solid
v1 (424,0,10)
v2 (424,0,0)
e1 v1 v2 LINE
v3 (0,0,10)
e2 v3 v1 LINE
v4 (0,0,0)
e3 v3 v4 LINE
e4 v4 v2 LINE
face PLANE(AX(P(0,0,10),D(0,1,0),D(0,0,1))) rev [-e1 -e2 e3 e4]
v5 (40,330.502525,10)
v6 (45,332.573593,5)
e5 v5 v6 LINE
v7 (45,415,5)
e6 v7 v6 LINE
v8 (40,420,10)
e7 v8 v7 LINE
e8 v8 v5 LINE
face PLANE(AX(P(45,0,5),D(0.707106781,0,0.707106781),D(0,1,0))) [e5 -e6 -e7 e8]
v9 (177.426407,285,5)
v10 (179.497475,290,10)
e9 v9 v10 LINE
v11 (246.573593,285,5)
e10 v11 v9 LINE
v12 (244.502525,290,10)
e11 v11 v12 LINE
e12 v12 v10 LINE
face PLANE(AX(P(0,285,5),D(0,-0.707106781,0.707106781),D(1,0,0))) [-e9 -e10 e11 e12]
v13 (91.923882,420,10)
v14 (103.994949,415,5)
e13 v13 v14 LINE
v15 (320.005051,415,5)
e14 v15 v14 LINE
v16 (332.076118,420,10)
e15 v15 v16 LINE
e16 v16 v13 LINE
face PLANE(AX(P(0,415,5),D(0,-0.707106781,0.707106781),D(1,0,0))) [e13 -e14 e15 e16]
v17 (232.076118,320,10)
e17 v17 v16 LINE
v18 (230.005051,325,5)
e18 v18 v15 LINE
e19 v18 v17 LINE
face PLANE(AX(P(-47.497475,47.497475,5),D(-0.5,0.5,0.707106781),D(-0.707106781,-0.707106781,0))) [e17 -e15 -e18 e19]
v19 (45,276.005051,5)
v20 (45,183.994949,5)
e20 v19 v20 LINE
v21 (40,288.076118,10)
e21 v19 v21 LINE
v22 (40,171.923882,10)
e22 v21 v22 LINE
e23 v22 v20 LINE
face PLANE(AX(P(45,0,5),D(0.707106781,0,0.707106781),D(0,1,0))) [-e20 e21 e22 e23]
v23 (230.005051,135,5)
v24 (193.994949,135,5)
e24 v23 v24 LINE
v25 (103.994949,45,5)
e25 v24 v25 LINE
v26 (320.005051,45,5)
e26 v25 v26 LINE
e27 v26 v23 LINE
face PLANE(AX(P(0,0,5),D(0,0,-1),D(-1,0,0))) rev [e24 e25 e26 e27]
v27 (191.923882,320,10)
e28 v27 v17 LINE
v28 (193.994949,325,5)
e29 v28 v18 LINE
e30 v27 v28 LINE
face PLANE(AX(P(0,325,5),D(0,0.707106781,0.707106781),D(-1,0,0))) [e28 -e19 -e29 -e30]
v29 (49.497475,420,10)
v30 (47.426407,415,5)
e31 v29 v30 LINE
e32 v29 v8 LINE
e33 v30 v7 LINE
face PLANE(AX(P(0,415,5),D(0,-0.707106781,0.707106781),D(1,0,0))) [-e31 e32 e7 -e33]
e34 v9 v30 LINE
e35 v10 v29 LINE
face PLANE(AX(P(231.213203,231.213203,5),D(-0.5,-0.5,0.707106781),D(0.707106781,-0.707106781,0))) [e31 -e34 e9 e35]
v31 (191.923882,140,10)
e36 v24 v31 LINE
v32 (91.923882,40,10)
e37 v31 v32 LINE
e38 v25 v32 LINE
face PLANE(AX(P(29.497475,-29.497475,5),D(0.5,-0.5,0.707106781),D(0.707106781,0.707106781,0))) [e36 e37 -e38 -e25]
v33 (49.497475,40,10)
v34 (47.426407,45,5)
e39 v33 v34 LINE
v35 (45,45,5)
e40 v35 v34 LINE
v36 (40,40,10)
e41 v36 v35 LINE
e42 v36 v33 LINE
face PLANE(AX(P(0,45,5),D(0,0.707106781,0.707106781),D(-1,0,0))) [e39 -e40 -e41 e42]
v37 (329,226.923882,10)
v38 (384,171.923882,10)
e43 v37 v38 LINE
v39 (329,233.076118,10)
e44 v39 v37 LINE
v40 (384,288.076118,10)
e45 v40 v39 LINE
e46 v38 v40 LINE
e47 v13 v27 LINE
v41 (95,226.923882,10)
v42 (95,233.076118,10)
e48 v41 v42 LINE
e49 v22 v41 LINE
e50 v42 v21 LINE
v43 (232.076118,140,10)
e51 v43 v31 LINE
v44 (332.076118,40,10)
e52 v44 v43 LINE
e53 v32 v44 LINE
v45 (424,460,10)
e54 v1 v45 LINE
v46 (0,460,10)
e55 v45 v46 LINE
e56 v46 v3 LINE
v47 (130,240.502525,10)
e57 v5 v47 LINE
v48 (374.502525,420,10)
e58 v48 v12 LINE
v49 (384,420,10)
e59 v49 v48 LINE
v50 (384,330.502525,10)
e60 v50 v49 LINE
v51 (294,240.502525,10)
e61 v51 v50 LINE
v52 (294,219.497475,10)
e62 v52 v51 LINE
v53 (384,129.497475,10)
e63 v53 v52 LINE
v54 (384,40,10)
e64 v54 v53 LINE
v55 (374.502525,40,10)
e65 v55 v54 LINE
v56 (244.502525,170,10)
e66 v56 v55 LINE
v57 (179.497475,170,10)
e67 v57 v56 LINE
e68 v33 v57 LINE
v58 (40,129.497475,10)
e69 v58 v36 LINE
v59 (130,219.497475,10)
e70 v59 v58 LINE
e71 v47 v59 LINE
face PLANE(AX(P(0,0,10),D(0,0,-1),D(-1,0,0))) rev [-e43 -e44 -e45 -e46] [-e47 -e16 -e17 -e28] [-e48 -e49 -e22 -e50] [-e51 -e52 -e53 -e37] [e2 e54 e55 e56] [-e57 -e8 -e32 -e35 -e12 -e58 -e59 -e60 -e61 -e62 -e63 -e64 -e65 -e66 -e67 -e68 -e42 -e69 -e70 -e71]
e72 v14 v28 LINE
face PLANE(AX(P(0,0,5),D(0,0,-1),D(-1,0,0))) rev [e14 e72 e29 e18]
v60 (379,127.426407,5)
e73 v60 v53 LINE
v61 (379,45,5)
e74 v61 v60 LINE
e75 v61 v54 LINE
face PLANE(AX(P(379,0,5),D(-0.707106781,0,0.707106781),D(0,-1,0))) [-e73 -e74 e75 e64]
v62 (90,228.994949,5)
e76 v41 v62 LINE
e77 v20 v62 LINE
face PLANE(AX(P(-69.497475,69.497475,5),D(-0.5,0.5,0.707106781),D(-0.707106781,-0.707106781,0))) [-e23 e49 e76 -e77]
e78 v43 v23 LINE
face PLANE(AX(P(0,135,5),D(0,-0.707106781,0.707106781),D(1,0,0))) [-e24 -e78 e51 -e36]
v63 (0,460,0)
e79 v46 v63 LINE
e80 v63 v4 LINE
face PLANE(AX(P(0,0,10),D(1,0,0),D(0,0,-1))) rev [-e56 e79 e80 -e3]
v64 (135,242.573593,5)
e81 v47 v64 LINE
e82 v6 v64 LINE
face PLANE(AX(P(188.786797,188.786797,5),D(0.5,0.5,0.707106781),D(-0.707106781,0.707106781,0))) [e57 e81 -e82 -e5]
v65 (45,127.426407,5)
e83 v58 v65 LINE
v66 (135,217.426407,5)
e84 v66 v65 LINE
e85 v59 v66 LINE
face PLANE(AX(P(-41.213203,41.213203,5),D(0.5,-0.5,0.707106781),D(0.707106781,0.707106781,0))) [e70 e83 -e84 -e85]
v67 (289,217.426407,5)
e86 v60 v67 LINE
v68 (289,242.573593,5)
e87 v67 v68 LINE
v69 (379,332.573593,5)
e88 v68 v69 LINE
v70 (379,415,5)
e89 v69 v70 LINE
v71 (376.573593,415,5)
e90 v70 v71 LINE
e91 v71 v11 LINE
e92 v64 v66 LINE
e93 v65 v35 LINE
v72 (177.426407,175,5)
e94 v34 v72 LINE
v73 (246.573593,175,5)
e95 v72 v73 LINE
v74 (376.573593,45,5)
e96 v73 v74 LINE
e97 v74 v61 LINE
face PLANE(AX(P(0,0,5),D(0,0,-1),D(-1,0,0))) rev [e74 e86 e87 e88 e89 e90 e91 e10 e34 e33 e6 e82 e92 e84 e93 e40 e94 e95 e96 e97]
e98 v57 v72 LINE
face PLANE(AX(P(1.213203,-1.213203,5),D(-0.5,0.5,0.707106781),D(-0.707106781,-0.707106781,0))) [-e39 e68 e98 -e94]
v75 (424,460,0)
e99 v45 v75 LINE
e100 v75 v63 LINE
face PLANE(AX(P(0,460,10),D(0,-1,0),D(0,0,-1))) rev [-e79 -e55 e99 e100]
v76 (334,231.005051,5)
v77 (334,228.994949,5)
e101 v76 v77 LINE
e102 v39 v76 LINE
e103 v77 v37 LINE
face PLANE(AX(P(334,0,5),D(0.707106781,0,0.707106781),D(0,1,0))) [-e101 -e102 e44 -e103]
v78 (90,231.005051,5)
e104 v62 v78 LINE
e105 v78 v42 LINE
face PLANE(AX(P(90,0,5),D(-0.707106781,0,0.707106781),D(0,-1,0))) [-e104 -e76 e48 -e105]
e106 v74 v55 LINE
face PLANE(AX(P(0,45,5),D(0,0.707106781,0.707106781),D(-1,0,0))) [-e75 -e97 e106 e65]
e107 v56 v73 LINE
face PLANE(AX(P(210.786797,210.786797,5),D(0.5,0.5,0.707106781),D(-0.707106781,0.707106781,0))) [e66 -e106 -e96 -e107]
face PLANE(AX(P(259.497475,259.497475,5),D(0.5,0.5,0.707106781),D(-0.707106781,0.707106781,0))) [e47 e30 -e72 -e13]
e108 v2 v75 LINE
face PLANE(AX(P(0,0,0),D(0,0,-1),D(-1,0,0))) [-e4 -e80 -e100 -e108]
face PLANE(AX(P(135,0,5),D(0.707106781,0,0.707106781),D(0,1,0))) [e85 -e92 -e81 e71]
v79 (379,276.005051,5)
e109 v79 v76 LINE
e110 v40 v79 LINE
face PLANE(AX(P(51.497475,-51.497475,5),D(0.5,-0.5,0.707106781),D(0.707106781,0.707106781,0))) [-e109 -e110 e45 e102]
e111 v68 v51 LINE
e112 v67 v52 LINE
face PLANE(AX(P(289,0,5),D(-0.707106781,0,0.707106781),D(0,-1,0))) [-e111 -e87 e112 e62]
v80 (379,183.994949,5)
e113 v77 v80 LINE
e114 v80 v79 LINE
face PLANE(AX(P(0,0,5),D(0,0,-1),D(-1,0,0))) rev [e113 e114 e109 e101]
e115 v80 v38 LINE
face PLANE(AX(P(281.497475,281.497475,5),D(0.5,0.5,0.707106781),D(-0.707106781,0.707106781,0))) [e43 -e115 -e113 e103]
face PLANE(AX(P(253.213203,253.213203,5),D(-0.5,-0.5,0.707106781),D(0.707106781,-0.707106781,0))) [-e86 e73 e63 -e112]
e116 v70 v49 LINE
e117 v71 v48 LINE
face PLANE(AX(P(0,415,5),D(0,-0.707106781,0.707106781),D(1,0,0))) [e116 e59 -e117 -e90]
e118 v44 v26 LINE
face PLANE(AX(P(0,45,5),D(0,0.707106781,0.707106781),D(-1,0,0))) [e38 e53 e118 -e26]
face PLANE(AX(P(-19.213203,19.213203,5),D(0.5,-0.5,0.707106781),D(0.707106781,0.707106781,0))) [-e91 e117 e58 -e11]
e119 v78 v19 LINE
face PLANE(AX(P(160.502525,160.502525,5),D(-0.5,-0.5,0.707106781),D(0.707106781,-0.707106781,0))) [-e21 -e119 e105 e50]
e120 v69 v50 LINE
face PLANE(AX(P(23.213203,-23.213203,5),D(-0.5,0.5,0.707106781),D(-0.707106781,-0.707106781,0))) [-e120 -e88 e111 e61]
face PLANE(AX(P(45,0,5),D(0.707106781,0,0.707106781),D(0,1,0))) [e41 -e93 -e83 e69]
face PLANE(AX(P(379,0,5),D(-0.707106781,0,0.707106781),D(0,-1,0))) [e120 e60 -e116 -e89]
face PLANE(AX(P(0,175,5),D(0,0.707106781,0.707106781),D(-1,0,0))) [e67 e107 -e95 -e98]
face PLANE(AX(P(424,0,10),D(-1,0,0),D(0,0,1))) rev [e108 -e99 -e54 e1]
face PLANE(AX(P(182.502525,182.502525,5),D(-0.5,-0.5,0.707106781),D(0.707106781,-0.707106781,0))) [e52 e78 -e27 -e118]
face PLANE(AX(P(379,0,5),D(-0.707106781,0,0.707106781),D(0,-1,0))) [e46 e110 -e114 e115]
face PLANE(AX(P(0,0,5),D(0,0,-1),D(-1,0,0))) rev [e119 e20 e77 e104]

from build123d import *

# Parameters (mm, degrees)
ESQUISSE1_W             = 424
ESQUISSE1_H             = 460
BOSS_EXTRU_1_DEPTH      = 10
ENL_V_MAT_EXTRU_1_DEPTH = 5
CHANFREIN1_SIZE         = 5


with BuildPart() as part:
    # Esquisse1 → Boss.-Extru.1 (new body)
    with BuildSketch(Plane.XY):
        with Locations((212, 230)):
            Rectangle(ESQUISSE1_W, ESQUISSE1_H)
    extrude(amount=BOSS_EXTRU_1_DEPTH)

    # Esquisse2 → Enlèv. mat.-Extru.1 (cut)
    with BuildSketch(Plane.XY.offset(10)):
        Polygon((95, 226.923881554), (95, 233.076118446), (40, 288.076118446), (40, 171.923881554), align=None)
        Polygon((191.923881554, 320), (232.076118446, 320), (332.076118446, 420), (91.923881554, 420), align=None)
        Polygon((40, 420), (40, 330.502525317), (130, 240.502525317), (130, 219.497474683), (40, 129.497474683), (40, 40), (49.497474683, 40), (179.497474683, 170), (244.502525317, 170), (374.502525317, 40), (384, 40), (384, 129.497474683), (294, 219.497474683), (294, 240.502525317), (384, 330.502525317), (384, 420), (374.502525317, 420), (244.502525317, 290), (179.497474683, 290), (49.497474683, 420), align=None)
        Polygon((329, 226.923881554), (329, 233.076118446), (384, 288.076118446), (384, 171.923881554), align=None)
        Polygon((332.076118446, 40), (91.923881554, 40), (191.923881554, 140), (232.076118446, 140), align=None)
    extrude(amount=-ENL_V_MAT_EXTRU_1_DEPTH, mode=Mode.SUBTRACT)

    # Chanfrein1
    chanfrein1_edges = [part.edges().sort_by_distance(p)[0] for p in [
        (212, 40, 5),
        (141.923881554, 90, 5),
        (212, 140, 5),
        (282.076118446, 90, 5),
        (40, 230, 5),
        (67.5, 260.576118446, 5),
        (95, 230, 5),
        (67.5, 199.423881554, 5),
        (384, 230, 5),
        (356.5, 199.423881554, 5),
        (329, 230, 5),
        (356.5, 260.576118446, 5),
        (114.497474683, 355, 5),
        (212, 290, 5),
        (309.502525317, 355, 5),
        (379.251262658, 420, 5),
        (384, 375.251262658, 5),
        (339, 285.502525317, 5),
        (294, 230, 5),
        (339, 174.497474683, 5),
        (384, 84.748737342, 5),
        (379.251262658, 40, 5),
        (309.502525317, 105, 5),
        (212, 170, 5),
        (114.497474683, 105, 5),
        (44.748737342, 40, 5),
        (40, 84.748737342, 5),
        (85, 174.497474683, 5),
        (130, 230, 5),
        (85, 285.502525317, 5),
        (40, 375.251262658, 5),
        (44.748737342, 420, 5),
        (212, 420, 5),
        (282.076118446, 370, 5),
        (212, 320, 5),
        (141.923881554, 370, 5),
    ]]
    chamfer(chanfrein1_edges, length=CHANFREIN1_SIZE - 0.0001)  # a hair under: the kernel refuses the full size


solid = part.part
